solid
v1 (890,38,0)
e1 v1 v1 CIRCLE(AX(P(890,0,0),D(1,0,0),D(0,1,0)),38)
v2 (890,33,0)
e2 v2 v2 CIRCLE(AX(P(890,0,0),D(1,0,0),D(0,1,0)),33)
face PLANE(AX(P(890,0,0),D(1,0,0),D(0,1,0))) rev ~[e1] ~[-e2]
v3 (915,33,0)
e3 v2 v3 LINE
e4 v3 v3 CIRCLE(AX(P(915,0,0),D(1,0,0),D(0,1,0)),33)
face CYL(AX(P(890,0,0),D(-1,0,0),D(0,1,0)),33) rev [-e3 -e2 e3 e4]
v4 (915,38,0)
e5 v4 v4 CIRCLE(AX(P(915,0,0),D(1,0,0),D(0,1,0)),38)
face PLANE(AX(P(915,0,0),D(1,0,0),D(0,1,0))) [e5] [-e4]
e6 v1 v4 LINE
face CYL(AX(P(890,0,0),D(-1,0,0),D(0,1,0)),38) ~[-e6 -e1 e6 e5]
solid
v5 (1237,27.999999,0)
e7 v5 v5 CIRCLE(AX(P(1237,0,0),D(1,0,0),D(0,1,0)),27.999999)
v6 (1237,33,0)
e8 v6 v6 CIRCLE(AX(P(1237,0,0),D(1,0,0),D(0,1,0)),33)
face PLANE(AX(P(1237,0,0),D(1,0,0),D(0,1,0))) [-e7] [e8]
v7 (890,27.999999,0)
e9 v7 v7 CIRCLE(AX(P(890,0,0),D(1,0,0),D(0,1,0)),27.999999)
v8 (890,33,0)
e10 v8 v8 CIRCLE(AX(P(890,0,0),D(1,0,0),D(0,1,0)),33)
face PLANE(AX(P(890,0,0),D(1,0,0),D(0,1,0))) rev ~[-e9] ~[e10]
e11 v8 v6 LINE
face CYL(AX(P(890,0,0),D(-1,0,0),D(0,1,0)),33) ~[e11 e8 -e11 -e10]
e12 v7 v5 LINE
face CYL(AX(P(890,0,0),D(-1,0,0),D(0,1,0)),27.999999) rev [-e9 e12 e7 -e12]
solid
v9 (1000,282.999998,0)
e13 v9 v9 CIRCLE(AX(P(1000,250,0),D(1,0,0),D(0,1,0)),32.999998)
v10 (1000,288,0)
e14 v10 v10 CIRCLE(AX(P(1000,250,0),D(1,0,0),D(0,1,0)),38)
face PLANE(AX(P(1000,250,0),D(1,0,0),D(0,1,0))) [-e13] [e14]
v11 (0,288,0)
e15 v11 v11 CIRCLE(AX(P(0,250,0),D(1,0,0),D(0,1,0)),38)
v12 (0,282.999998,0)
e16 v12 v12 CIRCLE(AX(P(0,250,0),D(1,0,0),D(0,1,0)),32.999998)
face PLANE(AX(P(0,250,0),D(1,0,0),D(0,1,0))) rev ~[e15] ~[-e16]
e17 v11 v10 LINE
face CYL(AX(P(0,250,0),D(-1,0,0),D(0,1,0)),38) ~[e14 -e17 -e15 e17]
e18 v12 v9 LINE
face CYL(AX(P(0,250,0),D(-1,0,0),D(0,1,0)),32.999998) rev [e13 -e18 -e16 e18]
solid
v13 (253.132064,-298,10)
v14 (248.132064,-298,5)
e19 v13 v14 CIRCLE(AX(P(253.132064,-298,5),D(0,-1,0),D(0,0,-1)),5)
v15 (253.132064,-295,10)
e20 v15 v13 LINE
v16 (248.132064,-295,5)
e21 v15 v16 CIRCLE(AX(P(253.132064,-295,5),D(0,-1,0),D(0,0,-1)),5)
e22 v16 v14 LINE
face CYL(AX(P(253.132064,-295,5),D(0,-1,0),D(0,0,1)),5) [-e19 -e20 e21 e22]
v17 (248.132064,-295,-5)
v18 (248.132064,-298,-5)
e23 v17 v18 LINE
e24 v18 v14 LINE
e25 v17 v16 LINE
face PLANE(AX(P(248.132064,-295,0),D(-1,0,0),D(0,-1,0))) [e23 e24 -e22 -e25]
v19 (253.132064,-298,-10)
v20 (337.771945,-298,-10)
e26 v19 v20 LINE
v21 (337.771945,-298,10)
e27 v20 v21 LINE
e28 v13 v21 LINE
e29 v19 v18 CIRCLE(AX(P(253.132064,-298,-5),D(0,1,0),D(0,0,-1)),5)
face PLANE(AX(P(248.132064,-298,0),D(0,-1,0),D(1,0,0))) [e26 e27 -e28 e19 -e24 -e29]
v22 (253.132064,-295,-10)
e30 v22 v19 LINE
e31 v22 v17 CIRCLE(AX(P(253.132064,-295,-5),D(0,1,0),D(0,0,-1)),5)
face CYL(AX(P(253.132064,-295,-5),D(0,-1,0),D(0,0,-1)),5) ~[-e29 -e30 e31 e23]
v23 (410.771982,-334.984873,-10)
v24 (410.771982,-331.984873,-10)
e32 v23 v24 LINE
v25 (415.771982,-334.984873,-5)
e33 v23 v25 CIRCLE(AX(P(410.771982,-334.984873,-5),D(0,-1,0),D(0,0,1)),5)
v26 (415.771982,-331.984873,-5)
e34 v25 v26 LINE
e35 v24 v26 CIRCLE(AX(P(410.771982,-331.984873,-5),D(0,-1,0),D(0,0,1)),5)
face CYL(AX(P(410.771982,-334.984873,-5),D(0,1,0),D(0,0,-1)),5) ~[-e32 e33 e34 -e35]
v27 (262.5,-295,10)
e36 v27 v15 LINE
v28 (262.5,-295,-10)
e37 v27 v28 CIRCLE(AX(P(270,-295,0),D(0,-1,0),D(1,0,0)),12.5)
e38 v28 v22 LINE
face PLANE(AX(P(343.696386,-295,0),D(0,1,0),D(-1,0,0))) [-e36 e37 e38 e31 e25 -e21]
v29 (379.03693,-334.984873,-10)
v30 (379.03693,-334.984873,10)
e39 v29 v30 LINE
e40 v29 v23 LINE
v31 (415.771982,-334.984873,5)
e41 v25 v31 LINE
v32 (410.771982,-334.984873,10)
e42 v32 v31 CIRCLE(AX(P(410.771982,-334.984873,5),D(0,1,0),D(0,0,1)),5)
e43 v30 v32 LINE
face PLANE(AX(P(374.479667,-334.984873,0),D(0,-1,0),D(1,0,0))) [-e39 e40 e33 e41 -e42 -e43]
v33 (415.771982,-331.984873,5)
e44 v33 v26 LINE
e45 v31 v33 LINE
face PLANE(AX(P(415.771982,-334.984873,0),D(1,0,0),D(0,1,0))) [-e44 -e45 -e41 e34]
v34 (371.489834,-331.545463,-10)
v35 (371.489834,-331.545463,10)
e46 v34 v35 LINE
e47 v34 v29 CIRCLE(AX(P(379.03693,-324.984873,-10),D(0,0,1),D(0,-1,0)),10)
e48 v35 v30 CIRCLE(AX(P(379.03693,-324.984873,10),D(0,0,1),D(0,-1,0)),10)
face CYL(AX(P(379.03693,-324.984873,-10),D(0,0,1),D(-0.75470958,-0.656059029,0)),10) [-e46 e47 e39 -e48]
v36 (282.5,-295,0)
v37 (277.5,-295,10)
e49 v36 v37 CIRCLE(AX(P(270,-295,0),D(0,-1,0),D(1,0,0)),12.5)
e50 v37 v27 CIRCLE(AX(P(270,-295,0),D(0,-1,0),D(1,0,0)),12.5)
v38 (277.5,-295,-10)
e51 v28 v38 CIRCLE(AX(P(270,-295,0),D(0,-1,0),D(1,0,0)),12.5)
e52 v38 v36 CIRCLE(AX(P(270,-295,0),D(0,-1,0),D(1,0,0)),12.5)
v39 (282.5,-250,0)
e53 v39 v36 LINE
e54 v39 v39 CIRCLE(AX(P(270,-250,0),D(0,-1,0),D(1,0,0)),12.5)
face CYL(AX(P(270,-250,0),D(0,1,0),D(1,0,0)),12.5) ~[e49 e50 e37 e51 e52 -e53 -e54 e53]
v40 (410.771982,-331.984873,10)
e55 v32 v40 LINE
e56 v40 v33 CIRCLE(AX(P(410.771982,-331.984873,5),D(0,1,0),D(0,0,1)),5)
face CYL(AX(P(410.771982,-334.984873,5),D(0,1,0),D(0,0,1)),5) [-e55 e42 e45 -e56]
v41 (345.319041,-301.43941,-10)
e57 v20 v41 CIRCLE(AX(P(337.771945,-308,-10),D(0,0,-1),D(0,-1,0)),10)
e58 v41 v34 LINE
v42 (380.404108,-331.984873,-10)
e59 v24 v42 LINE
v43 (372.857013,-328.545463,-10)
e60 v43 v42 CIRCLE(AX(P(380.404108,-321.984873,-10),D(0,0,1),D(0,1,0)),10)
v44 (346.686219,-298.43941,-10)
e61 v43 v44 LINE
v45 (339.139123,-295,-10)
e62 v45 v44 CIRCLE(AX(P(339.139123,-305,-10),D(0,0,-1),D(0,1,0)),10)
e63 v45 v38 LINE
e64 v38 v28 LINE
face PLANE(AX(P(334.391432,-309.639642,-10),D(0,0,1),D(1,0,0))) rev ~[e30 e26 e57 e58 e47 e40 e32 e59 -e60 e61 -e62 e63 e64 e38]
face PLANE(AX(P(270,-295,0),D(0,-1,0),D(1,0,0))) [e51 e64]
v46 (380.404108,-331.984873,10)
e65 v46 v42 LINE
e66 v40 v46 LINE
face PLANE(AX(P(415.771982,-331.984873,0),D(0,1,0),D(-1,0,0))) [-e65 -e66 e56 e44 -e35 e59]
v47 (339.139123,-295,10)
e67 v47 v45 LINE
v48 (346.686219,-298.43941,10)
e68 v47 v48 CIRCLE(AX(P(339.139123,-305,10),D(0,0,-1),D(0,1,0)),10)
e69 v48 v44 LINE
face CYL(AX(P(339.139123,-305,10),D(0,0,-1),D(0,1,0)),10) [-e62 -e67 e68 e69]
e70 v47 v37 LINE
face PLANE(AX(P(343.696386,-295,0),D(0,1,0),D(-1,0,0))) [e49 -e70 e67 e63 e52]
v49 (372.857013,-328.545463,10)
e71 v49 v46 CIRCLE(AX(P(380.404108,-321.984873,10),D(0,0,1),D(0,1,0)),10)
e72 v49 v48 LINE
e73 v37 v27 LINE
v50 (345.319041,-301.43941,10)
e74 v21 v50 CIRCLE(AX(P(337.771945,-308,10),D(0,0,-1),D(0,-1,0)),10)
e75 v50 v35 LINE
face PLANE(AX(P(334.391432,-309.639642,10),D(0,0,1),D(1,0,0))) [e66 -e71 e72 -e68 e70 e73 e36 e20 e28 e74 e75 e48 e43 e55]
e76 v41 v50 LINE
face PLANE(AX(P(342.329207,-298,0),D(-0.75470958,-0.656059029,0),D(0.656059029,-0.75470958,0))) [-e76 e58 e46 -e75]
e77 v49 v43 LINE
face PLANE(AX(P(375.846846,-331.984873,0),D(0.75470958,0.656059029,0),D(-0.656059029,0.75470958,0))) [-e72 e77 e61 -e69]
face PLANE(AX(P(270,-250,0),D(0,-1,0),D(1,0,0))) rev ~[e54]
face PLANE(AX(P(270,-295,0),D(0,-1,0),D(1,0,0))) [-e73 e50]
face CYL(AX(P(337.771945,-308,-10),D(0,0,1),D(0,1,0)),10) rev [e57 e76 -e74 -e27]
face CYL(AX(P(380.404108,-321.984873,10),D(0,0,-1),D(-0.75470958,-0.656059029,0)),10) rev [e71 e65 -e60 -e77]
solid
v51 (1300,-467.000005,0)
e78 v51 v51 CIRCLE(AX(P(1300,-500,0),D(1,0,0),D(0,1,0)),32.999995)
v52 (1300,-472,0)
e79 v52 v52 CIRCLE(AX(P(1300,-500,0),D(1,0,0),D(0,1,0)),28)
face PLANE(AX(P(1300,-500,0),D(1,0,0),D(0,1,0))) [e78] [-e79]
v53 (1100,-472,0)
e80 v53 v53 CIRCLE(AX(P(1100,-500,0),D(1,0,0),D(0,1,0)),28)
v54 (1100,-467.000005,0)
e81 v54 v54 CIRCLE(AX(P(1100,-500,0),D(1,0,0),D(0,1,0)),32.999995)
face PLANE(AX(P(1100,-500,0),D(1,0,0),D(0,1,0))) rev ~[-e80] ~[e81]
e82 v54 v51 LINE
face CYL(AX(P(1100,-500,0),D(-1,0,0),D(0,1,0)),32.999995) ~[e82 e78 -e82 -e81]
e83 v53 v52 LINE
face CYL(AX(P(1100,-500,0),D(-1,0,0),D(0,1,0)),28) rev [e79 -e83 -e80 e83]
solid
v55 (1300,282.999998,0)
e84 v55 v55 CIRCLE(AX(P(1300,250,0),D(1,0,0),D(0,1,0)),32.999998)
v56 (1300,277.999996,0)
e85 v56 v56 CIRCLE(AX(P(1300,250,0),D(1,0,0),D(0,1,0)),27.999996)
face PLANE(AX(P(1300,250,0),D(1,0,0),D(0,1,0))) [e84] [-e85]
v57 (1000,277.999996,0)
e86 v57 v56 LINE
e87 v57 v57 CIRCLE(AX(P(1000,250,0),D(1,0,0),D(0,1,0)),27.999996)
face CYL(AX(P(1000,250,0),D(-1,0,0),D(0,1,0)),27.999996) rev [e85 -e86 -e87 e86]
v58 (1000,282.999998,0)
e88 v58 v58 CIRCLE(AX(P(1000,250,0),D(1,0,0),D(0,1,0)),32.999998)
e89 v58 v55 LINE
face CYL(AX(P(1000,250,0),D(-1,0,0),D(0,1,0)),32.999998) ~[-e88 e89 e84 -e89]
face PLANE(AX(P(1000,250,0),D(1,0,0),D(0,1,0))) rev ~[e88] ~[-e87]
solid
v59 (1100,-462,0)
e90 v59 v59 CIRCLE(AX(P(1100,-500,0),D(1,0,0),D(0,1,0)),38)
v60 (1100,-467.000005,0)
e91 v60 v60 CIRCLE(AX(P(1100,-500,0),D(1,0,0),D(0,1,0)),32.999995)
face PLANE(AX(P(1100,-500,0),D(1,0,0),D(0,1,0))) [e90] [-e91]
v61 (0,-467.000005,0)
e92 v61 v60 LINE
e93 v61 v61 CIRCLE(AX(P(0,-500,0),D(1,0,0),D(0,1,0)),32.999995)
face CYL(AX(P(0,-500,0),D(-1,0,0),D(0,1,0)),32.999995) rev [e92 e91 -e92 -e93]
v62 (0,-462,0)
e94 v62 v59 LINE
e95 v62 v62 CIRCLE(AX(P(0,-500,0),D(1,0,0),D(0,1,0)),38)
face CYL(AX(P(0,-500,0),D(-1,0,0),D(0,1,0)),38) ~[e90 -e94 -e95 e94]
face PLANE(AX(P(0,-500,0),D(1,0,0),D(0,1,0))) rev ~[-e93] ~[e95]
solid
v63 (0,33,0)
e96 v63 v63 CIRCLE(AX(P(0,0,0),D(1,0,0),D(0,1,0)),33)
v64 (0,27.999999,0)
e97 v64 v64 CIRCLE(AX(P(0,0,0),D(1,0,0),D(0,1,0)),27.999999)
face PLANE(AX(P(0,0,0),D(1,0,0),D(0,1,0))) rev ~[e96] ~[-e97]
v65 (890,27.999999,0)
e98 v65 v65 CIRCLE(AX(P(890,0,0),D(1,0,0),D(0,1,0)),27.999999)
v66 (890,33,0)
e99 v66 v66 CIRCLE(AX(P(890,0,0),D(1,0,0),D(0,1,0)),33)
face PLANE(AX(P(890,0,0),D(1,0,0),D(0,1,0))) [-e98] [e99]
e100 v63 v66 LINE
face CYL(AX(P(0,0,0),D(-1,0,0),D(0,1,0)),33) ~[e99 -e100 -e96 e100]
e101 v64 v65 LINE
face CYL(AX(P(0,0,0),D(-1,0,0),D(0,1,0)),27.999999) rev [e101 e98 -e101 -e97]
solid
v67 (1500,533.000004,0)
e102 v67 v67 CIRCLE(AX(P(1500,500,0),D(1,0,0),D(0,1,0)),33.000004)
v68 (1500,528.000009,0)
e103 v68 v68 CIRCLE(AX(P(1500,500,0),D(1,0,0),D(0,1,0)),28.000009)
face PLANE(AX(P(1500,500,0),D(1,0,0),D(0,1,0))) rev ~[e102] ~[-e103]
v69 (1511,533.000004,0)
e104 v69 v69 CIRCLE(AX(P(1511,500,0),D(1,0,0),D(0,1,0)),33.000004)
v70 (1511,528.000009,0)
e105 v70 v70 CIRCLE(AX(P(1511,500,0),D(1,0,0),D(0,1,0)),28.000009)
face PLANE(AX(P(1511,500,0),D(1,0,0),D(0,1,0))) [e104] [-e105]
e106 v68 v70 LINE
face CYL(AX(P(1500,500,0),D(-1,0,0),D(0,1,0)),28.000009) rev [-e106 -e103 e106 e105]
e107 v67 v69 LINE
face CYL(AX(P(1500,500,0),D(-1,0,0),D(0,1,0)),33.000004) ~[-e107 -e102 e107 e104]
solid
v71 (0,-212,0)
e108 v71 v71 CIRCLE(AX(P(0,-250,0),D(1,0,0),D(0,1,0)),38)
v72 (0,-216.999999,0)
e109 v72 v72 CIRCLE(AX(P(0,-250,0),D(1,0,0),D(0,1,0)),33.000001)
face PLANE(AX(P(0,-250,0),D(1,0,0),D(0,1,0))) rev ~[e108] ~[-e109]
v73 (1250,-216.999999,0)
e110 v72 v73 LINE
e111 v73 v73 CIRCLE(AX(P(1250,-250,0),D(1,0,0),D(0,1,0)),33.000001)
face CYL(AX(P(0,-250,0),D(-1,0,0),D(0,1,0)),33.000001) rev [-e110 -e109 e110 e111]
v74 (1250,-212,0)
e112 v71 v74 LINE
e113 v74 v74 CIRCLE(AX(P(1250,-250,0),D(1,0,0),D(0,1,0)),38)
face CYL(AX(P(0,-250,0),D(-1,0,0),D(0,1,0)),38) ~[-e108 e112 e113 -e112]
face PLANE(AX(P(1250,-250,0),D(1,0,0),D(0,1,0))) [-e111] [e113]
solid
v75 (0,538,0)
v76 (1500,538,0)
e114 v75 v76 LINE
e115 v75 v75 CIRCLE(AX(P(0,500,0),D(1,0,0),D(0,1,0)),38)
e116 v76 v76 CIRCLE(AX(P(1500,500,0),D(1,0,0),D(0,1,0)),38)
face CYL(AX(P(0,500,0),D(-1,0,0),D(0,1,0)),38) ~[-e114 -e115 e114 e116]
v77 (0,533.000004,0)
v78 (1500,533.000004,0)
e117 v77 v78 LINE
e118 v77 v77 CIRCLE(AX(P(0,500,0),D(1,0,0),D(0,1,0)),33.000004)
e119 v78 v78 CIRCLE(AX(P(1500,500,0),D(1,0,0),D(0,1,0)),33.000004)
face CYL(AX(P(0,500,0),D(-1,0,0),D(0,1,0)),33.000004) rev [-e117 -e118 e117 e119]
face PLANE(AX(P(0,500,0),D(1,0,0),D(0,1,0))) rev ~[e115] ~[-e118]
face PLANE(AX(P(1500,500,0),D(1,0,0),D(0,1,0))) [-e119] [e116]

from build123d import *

# Parameters (mm, degrees)
F0_R      = 38
F0_R_2    = 32.9999953508
F1_DEPTH  = 1100
F2_R      = 32.9999953508
F2_R_2    = 28.0000001192
F3_DEPTH  = 200
F0_R_3    = 33.0000013113
F4_DEPTH  = 1250
F0_R_4    = 32.9999998212
F0_R_5    = 27.9999990016
F5_DEPTH  = 890
F6_R      = 37.9999998212
F6_R_2    = 32.9999998212
F7_DEPTH  = 25
F8_DEPTH  = 347
F0_R_6    = 32.9999983311
F9_DEPTH  = 1000
F10_R     = 32.9999983311
F10_R_2   = 27.9999956489
F11_DEPTH = 300
F0_R_7    = 33.0000042915
F12_DEPTH = 1500
F13_R     = 33.0000042915
F13_R_2   = 28.0000090599
F14_DEPTH = 11
F16_R     = 12.5
F17_DEPTH = 45
F20_DEPTH = 10
F21_R     = 5
F22_R     = 10


# Not quite as in the source:
# - the program builds the solid bodies; features that only make, move or delete a surface that nothing else refers to are left out


with BuildPart() as f1:
    # F0 (on Right) → F1 (new body)
    with BuildSketch(Plane.YZ):
        with Locations((-500, 0)):
            Circle(F0_R)
        with Locations((-500, 0)):
            Circle(F0_R_2, mode=Mode.SUBTRACT)
    extrude(amount=F1_DEPTH)


with BuildPart() as f3:
    # F2 (on face) → F3 (new body)
    with BuildSketch(Plane.YZ.offset(1100)):
        with Locations((-500, 0)):
            Circle(F2_R)
        with Locations((-500, 0)):
            Circle(F2_R_2, mode=Mode.SUBTRACT)
    extrude(amount=F3_DEPTH)


with BuildPart() as f4:
    # F0 (on Right) → F4 (new body)
    with BuildSketch(Plane.YZ):
        with Locations((-250, 0)):
            Circle(F0_R)
        with Locations((-250, 0)):
            Circle(F0_R_3, mode=Mode.SUBTRACT)
    extrude(amount=F4_DEPTH)


with BuildPart() as f5:
    # F0 (on Right) → F5 (new body)
    with BuildSketch(Plane.YZ):
        Circle(F0_R_4)
        Circle(F0_R_5, mode=Mode.SUBTRACT)
    extrude(amount=F5_DEPTH)


with BuildPart() as f7:
    # F6 (on face) → F7 (new body)
    with BuildSketch(Plane.YZ.offset(890)):
        Circle(F6_R)
        Circle(F6_R_2, mode=Mode.SUBTRACT)
    extrude(amount=F7_DEPTH)


with BuildPart() as f8:
    # F8 (new): a face of the model
    f8_faces = [f5.part.faces().sort_by_distance(p)[0] for p in [
        (890, -32.0666188751, 0),
    ]]
    extrude(f8_faces, amount=F8_DEPTH)


with BuildPart() as f9:
    # F0 (on Right) → F9 (new body)
    with BuildSketch(Plane.YZ):
        with Locations((250, 0)):
            Circle(F0_R)
        with Locations((250, 0)):
            Circle(F0_R_6, mode=Mode.SUBTRACT)
    extrude(amount=F9_DEPTH)


with BuildPart() as f11:
    # F10 (on face) → F11 (new body)
    with BuildSketch(Plane.YZ.offset(1000)):
        with Locations((250, 0)):
            Circle(F10_R)
        with Locations((250, 0)):
            Circle(F10_R_2, mode=Mode.SUBTRACT)
    extrude(amount=F11_DEPTH)


with BuildPart() as f12:
    # F0 (on Right) → F12 (new body)
    with BuildSketch(Plane.YZ):
        with Locations((500, 0)):
            Circle(F0_R)
        with Locations((500, 0)):
            Circle(F0_R_7, mode=Mode.SUBTRACT)
    extrude(amount=F12_DEPTH)


with BuildPart() as f14:
    # F13 (on face) → F14 (new body)
    with BuildSketch(Plane.YZ.offset(1500)):
        with Locations((500, 0)):
            Circle(F13_R)
        with Locations((500, 0)):
            Circle(F13_R_2, mode=Mode.SUBTRACT)
    extrude(amount=F14_DEPTH)


with BuildPart() as f17:
    # F16 (on plane+point) → F17 (new body)
    with BuildSketch(Plane.XZ.offset(250)):
        with Locations((270, 0)):
            Circle(F16_R)
    extrude(amount=F17_DEPTH)

    # F18 (on Top) → F20 (join, symmetric)
    with BuildSketch(Plane.XY):
        Polygon((343.6963860454, -295), (248.1320642157, -295), (248.1320642157, -298), (342.3292072788, -298), (374.479667039, -334.9848731859), (396.771981816, -334.9848731859), (400.771981816, -334.9848731859), (415.771981816, -334.9848731859), (415.771981816, -331.9848731859), (375.8468458056, -331.9848731859), align=None)
    extrude(amount=F20_DEPTH, both=True)

    # F21
    f21_edges = [f17.edges().sort_by_distance(p)[0] for p in [
        (415.771982, -333.484873, 10),
        (415.771982, -333.484873, -10),
        (248.132064, -296.5, 10),
        (248.132064, -296.5, -10),
    ]]
    fillet(f21_edges, radius=F21_R)

    # F22
    f22_edges = [f17.edges().sort_by_distance(p)[0] for p in [
        (342.329207, -298, 0),
        (374.479667, -334.984873, 0),
        (375.846846, -331.984873, 0),
        (343.696386, -295, 0),
    ]]
    fillet(f22_edges, radius=F22_R)


solid = Compound([f1.part, f3.part, f4.part, f5.part, f7.part, f8.part, f9.part, f11.part, f12.part, f14.part, f17.part])
